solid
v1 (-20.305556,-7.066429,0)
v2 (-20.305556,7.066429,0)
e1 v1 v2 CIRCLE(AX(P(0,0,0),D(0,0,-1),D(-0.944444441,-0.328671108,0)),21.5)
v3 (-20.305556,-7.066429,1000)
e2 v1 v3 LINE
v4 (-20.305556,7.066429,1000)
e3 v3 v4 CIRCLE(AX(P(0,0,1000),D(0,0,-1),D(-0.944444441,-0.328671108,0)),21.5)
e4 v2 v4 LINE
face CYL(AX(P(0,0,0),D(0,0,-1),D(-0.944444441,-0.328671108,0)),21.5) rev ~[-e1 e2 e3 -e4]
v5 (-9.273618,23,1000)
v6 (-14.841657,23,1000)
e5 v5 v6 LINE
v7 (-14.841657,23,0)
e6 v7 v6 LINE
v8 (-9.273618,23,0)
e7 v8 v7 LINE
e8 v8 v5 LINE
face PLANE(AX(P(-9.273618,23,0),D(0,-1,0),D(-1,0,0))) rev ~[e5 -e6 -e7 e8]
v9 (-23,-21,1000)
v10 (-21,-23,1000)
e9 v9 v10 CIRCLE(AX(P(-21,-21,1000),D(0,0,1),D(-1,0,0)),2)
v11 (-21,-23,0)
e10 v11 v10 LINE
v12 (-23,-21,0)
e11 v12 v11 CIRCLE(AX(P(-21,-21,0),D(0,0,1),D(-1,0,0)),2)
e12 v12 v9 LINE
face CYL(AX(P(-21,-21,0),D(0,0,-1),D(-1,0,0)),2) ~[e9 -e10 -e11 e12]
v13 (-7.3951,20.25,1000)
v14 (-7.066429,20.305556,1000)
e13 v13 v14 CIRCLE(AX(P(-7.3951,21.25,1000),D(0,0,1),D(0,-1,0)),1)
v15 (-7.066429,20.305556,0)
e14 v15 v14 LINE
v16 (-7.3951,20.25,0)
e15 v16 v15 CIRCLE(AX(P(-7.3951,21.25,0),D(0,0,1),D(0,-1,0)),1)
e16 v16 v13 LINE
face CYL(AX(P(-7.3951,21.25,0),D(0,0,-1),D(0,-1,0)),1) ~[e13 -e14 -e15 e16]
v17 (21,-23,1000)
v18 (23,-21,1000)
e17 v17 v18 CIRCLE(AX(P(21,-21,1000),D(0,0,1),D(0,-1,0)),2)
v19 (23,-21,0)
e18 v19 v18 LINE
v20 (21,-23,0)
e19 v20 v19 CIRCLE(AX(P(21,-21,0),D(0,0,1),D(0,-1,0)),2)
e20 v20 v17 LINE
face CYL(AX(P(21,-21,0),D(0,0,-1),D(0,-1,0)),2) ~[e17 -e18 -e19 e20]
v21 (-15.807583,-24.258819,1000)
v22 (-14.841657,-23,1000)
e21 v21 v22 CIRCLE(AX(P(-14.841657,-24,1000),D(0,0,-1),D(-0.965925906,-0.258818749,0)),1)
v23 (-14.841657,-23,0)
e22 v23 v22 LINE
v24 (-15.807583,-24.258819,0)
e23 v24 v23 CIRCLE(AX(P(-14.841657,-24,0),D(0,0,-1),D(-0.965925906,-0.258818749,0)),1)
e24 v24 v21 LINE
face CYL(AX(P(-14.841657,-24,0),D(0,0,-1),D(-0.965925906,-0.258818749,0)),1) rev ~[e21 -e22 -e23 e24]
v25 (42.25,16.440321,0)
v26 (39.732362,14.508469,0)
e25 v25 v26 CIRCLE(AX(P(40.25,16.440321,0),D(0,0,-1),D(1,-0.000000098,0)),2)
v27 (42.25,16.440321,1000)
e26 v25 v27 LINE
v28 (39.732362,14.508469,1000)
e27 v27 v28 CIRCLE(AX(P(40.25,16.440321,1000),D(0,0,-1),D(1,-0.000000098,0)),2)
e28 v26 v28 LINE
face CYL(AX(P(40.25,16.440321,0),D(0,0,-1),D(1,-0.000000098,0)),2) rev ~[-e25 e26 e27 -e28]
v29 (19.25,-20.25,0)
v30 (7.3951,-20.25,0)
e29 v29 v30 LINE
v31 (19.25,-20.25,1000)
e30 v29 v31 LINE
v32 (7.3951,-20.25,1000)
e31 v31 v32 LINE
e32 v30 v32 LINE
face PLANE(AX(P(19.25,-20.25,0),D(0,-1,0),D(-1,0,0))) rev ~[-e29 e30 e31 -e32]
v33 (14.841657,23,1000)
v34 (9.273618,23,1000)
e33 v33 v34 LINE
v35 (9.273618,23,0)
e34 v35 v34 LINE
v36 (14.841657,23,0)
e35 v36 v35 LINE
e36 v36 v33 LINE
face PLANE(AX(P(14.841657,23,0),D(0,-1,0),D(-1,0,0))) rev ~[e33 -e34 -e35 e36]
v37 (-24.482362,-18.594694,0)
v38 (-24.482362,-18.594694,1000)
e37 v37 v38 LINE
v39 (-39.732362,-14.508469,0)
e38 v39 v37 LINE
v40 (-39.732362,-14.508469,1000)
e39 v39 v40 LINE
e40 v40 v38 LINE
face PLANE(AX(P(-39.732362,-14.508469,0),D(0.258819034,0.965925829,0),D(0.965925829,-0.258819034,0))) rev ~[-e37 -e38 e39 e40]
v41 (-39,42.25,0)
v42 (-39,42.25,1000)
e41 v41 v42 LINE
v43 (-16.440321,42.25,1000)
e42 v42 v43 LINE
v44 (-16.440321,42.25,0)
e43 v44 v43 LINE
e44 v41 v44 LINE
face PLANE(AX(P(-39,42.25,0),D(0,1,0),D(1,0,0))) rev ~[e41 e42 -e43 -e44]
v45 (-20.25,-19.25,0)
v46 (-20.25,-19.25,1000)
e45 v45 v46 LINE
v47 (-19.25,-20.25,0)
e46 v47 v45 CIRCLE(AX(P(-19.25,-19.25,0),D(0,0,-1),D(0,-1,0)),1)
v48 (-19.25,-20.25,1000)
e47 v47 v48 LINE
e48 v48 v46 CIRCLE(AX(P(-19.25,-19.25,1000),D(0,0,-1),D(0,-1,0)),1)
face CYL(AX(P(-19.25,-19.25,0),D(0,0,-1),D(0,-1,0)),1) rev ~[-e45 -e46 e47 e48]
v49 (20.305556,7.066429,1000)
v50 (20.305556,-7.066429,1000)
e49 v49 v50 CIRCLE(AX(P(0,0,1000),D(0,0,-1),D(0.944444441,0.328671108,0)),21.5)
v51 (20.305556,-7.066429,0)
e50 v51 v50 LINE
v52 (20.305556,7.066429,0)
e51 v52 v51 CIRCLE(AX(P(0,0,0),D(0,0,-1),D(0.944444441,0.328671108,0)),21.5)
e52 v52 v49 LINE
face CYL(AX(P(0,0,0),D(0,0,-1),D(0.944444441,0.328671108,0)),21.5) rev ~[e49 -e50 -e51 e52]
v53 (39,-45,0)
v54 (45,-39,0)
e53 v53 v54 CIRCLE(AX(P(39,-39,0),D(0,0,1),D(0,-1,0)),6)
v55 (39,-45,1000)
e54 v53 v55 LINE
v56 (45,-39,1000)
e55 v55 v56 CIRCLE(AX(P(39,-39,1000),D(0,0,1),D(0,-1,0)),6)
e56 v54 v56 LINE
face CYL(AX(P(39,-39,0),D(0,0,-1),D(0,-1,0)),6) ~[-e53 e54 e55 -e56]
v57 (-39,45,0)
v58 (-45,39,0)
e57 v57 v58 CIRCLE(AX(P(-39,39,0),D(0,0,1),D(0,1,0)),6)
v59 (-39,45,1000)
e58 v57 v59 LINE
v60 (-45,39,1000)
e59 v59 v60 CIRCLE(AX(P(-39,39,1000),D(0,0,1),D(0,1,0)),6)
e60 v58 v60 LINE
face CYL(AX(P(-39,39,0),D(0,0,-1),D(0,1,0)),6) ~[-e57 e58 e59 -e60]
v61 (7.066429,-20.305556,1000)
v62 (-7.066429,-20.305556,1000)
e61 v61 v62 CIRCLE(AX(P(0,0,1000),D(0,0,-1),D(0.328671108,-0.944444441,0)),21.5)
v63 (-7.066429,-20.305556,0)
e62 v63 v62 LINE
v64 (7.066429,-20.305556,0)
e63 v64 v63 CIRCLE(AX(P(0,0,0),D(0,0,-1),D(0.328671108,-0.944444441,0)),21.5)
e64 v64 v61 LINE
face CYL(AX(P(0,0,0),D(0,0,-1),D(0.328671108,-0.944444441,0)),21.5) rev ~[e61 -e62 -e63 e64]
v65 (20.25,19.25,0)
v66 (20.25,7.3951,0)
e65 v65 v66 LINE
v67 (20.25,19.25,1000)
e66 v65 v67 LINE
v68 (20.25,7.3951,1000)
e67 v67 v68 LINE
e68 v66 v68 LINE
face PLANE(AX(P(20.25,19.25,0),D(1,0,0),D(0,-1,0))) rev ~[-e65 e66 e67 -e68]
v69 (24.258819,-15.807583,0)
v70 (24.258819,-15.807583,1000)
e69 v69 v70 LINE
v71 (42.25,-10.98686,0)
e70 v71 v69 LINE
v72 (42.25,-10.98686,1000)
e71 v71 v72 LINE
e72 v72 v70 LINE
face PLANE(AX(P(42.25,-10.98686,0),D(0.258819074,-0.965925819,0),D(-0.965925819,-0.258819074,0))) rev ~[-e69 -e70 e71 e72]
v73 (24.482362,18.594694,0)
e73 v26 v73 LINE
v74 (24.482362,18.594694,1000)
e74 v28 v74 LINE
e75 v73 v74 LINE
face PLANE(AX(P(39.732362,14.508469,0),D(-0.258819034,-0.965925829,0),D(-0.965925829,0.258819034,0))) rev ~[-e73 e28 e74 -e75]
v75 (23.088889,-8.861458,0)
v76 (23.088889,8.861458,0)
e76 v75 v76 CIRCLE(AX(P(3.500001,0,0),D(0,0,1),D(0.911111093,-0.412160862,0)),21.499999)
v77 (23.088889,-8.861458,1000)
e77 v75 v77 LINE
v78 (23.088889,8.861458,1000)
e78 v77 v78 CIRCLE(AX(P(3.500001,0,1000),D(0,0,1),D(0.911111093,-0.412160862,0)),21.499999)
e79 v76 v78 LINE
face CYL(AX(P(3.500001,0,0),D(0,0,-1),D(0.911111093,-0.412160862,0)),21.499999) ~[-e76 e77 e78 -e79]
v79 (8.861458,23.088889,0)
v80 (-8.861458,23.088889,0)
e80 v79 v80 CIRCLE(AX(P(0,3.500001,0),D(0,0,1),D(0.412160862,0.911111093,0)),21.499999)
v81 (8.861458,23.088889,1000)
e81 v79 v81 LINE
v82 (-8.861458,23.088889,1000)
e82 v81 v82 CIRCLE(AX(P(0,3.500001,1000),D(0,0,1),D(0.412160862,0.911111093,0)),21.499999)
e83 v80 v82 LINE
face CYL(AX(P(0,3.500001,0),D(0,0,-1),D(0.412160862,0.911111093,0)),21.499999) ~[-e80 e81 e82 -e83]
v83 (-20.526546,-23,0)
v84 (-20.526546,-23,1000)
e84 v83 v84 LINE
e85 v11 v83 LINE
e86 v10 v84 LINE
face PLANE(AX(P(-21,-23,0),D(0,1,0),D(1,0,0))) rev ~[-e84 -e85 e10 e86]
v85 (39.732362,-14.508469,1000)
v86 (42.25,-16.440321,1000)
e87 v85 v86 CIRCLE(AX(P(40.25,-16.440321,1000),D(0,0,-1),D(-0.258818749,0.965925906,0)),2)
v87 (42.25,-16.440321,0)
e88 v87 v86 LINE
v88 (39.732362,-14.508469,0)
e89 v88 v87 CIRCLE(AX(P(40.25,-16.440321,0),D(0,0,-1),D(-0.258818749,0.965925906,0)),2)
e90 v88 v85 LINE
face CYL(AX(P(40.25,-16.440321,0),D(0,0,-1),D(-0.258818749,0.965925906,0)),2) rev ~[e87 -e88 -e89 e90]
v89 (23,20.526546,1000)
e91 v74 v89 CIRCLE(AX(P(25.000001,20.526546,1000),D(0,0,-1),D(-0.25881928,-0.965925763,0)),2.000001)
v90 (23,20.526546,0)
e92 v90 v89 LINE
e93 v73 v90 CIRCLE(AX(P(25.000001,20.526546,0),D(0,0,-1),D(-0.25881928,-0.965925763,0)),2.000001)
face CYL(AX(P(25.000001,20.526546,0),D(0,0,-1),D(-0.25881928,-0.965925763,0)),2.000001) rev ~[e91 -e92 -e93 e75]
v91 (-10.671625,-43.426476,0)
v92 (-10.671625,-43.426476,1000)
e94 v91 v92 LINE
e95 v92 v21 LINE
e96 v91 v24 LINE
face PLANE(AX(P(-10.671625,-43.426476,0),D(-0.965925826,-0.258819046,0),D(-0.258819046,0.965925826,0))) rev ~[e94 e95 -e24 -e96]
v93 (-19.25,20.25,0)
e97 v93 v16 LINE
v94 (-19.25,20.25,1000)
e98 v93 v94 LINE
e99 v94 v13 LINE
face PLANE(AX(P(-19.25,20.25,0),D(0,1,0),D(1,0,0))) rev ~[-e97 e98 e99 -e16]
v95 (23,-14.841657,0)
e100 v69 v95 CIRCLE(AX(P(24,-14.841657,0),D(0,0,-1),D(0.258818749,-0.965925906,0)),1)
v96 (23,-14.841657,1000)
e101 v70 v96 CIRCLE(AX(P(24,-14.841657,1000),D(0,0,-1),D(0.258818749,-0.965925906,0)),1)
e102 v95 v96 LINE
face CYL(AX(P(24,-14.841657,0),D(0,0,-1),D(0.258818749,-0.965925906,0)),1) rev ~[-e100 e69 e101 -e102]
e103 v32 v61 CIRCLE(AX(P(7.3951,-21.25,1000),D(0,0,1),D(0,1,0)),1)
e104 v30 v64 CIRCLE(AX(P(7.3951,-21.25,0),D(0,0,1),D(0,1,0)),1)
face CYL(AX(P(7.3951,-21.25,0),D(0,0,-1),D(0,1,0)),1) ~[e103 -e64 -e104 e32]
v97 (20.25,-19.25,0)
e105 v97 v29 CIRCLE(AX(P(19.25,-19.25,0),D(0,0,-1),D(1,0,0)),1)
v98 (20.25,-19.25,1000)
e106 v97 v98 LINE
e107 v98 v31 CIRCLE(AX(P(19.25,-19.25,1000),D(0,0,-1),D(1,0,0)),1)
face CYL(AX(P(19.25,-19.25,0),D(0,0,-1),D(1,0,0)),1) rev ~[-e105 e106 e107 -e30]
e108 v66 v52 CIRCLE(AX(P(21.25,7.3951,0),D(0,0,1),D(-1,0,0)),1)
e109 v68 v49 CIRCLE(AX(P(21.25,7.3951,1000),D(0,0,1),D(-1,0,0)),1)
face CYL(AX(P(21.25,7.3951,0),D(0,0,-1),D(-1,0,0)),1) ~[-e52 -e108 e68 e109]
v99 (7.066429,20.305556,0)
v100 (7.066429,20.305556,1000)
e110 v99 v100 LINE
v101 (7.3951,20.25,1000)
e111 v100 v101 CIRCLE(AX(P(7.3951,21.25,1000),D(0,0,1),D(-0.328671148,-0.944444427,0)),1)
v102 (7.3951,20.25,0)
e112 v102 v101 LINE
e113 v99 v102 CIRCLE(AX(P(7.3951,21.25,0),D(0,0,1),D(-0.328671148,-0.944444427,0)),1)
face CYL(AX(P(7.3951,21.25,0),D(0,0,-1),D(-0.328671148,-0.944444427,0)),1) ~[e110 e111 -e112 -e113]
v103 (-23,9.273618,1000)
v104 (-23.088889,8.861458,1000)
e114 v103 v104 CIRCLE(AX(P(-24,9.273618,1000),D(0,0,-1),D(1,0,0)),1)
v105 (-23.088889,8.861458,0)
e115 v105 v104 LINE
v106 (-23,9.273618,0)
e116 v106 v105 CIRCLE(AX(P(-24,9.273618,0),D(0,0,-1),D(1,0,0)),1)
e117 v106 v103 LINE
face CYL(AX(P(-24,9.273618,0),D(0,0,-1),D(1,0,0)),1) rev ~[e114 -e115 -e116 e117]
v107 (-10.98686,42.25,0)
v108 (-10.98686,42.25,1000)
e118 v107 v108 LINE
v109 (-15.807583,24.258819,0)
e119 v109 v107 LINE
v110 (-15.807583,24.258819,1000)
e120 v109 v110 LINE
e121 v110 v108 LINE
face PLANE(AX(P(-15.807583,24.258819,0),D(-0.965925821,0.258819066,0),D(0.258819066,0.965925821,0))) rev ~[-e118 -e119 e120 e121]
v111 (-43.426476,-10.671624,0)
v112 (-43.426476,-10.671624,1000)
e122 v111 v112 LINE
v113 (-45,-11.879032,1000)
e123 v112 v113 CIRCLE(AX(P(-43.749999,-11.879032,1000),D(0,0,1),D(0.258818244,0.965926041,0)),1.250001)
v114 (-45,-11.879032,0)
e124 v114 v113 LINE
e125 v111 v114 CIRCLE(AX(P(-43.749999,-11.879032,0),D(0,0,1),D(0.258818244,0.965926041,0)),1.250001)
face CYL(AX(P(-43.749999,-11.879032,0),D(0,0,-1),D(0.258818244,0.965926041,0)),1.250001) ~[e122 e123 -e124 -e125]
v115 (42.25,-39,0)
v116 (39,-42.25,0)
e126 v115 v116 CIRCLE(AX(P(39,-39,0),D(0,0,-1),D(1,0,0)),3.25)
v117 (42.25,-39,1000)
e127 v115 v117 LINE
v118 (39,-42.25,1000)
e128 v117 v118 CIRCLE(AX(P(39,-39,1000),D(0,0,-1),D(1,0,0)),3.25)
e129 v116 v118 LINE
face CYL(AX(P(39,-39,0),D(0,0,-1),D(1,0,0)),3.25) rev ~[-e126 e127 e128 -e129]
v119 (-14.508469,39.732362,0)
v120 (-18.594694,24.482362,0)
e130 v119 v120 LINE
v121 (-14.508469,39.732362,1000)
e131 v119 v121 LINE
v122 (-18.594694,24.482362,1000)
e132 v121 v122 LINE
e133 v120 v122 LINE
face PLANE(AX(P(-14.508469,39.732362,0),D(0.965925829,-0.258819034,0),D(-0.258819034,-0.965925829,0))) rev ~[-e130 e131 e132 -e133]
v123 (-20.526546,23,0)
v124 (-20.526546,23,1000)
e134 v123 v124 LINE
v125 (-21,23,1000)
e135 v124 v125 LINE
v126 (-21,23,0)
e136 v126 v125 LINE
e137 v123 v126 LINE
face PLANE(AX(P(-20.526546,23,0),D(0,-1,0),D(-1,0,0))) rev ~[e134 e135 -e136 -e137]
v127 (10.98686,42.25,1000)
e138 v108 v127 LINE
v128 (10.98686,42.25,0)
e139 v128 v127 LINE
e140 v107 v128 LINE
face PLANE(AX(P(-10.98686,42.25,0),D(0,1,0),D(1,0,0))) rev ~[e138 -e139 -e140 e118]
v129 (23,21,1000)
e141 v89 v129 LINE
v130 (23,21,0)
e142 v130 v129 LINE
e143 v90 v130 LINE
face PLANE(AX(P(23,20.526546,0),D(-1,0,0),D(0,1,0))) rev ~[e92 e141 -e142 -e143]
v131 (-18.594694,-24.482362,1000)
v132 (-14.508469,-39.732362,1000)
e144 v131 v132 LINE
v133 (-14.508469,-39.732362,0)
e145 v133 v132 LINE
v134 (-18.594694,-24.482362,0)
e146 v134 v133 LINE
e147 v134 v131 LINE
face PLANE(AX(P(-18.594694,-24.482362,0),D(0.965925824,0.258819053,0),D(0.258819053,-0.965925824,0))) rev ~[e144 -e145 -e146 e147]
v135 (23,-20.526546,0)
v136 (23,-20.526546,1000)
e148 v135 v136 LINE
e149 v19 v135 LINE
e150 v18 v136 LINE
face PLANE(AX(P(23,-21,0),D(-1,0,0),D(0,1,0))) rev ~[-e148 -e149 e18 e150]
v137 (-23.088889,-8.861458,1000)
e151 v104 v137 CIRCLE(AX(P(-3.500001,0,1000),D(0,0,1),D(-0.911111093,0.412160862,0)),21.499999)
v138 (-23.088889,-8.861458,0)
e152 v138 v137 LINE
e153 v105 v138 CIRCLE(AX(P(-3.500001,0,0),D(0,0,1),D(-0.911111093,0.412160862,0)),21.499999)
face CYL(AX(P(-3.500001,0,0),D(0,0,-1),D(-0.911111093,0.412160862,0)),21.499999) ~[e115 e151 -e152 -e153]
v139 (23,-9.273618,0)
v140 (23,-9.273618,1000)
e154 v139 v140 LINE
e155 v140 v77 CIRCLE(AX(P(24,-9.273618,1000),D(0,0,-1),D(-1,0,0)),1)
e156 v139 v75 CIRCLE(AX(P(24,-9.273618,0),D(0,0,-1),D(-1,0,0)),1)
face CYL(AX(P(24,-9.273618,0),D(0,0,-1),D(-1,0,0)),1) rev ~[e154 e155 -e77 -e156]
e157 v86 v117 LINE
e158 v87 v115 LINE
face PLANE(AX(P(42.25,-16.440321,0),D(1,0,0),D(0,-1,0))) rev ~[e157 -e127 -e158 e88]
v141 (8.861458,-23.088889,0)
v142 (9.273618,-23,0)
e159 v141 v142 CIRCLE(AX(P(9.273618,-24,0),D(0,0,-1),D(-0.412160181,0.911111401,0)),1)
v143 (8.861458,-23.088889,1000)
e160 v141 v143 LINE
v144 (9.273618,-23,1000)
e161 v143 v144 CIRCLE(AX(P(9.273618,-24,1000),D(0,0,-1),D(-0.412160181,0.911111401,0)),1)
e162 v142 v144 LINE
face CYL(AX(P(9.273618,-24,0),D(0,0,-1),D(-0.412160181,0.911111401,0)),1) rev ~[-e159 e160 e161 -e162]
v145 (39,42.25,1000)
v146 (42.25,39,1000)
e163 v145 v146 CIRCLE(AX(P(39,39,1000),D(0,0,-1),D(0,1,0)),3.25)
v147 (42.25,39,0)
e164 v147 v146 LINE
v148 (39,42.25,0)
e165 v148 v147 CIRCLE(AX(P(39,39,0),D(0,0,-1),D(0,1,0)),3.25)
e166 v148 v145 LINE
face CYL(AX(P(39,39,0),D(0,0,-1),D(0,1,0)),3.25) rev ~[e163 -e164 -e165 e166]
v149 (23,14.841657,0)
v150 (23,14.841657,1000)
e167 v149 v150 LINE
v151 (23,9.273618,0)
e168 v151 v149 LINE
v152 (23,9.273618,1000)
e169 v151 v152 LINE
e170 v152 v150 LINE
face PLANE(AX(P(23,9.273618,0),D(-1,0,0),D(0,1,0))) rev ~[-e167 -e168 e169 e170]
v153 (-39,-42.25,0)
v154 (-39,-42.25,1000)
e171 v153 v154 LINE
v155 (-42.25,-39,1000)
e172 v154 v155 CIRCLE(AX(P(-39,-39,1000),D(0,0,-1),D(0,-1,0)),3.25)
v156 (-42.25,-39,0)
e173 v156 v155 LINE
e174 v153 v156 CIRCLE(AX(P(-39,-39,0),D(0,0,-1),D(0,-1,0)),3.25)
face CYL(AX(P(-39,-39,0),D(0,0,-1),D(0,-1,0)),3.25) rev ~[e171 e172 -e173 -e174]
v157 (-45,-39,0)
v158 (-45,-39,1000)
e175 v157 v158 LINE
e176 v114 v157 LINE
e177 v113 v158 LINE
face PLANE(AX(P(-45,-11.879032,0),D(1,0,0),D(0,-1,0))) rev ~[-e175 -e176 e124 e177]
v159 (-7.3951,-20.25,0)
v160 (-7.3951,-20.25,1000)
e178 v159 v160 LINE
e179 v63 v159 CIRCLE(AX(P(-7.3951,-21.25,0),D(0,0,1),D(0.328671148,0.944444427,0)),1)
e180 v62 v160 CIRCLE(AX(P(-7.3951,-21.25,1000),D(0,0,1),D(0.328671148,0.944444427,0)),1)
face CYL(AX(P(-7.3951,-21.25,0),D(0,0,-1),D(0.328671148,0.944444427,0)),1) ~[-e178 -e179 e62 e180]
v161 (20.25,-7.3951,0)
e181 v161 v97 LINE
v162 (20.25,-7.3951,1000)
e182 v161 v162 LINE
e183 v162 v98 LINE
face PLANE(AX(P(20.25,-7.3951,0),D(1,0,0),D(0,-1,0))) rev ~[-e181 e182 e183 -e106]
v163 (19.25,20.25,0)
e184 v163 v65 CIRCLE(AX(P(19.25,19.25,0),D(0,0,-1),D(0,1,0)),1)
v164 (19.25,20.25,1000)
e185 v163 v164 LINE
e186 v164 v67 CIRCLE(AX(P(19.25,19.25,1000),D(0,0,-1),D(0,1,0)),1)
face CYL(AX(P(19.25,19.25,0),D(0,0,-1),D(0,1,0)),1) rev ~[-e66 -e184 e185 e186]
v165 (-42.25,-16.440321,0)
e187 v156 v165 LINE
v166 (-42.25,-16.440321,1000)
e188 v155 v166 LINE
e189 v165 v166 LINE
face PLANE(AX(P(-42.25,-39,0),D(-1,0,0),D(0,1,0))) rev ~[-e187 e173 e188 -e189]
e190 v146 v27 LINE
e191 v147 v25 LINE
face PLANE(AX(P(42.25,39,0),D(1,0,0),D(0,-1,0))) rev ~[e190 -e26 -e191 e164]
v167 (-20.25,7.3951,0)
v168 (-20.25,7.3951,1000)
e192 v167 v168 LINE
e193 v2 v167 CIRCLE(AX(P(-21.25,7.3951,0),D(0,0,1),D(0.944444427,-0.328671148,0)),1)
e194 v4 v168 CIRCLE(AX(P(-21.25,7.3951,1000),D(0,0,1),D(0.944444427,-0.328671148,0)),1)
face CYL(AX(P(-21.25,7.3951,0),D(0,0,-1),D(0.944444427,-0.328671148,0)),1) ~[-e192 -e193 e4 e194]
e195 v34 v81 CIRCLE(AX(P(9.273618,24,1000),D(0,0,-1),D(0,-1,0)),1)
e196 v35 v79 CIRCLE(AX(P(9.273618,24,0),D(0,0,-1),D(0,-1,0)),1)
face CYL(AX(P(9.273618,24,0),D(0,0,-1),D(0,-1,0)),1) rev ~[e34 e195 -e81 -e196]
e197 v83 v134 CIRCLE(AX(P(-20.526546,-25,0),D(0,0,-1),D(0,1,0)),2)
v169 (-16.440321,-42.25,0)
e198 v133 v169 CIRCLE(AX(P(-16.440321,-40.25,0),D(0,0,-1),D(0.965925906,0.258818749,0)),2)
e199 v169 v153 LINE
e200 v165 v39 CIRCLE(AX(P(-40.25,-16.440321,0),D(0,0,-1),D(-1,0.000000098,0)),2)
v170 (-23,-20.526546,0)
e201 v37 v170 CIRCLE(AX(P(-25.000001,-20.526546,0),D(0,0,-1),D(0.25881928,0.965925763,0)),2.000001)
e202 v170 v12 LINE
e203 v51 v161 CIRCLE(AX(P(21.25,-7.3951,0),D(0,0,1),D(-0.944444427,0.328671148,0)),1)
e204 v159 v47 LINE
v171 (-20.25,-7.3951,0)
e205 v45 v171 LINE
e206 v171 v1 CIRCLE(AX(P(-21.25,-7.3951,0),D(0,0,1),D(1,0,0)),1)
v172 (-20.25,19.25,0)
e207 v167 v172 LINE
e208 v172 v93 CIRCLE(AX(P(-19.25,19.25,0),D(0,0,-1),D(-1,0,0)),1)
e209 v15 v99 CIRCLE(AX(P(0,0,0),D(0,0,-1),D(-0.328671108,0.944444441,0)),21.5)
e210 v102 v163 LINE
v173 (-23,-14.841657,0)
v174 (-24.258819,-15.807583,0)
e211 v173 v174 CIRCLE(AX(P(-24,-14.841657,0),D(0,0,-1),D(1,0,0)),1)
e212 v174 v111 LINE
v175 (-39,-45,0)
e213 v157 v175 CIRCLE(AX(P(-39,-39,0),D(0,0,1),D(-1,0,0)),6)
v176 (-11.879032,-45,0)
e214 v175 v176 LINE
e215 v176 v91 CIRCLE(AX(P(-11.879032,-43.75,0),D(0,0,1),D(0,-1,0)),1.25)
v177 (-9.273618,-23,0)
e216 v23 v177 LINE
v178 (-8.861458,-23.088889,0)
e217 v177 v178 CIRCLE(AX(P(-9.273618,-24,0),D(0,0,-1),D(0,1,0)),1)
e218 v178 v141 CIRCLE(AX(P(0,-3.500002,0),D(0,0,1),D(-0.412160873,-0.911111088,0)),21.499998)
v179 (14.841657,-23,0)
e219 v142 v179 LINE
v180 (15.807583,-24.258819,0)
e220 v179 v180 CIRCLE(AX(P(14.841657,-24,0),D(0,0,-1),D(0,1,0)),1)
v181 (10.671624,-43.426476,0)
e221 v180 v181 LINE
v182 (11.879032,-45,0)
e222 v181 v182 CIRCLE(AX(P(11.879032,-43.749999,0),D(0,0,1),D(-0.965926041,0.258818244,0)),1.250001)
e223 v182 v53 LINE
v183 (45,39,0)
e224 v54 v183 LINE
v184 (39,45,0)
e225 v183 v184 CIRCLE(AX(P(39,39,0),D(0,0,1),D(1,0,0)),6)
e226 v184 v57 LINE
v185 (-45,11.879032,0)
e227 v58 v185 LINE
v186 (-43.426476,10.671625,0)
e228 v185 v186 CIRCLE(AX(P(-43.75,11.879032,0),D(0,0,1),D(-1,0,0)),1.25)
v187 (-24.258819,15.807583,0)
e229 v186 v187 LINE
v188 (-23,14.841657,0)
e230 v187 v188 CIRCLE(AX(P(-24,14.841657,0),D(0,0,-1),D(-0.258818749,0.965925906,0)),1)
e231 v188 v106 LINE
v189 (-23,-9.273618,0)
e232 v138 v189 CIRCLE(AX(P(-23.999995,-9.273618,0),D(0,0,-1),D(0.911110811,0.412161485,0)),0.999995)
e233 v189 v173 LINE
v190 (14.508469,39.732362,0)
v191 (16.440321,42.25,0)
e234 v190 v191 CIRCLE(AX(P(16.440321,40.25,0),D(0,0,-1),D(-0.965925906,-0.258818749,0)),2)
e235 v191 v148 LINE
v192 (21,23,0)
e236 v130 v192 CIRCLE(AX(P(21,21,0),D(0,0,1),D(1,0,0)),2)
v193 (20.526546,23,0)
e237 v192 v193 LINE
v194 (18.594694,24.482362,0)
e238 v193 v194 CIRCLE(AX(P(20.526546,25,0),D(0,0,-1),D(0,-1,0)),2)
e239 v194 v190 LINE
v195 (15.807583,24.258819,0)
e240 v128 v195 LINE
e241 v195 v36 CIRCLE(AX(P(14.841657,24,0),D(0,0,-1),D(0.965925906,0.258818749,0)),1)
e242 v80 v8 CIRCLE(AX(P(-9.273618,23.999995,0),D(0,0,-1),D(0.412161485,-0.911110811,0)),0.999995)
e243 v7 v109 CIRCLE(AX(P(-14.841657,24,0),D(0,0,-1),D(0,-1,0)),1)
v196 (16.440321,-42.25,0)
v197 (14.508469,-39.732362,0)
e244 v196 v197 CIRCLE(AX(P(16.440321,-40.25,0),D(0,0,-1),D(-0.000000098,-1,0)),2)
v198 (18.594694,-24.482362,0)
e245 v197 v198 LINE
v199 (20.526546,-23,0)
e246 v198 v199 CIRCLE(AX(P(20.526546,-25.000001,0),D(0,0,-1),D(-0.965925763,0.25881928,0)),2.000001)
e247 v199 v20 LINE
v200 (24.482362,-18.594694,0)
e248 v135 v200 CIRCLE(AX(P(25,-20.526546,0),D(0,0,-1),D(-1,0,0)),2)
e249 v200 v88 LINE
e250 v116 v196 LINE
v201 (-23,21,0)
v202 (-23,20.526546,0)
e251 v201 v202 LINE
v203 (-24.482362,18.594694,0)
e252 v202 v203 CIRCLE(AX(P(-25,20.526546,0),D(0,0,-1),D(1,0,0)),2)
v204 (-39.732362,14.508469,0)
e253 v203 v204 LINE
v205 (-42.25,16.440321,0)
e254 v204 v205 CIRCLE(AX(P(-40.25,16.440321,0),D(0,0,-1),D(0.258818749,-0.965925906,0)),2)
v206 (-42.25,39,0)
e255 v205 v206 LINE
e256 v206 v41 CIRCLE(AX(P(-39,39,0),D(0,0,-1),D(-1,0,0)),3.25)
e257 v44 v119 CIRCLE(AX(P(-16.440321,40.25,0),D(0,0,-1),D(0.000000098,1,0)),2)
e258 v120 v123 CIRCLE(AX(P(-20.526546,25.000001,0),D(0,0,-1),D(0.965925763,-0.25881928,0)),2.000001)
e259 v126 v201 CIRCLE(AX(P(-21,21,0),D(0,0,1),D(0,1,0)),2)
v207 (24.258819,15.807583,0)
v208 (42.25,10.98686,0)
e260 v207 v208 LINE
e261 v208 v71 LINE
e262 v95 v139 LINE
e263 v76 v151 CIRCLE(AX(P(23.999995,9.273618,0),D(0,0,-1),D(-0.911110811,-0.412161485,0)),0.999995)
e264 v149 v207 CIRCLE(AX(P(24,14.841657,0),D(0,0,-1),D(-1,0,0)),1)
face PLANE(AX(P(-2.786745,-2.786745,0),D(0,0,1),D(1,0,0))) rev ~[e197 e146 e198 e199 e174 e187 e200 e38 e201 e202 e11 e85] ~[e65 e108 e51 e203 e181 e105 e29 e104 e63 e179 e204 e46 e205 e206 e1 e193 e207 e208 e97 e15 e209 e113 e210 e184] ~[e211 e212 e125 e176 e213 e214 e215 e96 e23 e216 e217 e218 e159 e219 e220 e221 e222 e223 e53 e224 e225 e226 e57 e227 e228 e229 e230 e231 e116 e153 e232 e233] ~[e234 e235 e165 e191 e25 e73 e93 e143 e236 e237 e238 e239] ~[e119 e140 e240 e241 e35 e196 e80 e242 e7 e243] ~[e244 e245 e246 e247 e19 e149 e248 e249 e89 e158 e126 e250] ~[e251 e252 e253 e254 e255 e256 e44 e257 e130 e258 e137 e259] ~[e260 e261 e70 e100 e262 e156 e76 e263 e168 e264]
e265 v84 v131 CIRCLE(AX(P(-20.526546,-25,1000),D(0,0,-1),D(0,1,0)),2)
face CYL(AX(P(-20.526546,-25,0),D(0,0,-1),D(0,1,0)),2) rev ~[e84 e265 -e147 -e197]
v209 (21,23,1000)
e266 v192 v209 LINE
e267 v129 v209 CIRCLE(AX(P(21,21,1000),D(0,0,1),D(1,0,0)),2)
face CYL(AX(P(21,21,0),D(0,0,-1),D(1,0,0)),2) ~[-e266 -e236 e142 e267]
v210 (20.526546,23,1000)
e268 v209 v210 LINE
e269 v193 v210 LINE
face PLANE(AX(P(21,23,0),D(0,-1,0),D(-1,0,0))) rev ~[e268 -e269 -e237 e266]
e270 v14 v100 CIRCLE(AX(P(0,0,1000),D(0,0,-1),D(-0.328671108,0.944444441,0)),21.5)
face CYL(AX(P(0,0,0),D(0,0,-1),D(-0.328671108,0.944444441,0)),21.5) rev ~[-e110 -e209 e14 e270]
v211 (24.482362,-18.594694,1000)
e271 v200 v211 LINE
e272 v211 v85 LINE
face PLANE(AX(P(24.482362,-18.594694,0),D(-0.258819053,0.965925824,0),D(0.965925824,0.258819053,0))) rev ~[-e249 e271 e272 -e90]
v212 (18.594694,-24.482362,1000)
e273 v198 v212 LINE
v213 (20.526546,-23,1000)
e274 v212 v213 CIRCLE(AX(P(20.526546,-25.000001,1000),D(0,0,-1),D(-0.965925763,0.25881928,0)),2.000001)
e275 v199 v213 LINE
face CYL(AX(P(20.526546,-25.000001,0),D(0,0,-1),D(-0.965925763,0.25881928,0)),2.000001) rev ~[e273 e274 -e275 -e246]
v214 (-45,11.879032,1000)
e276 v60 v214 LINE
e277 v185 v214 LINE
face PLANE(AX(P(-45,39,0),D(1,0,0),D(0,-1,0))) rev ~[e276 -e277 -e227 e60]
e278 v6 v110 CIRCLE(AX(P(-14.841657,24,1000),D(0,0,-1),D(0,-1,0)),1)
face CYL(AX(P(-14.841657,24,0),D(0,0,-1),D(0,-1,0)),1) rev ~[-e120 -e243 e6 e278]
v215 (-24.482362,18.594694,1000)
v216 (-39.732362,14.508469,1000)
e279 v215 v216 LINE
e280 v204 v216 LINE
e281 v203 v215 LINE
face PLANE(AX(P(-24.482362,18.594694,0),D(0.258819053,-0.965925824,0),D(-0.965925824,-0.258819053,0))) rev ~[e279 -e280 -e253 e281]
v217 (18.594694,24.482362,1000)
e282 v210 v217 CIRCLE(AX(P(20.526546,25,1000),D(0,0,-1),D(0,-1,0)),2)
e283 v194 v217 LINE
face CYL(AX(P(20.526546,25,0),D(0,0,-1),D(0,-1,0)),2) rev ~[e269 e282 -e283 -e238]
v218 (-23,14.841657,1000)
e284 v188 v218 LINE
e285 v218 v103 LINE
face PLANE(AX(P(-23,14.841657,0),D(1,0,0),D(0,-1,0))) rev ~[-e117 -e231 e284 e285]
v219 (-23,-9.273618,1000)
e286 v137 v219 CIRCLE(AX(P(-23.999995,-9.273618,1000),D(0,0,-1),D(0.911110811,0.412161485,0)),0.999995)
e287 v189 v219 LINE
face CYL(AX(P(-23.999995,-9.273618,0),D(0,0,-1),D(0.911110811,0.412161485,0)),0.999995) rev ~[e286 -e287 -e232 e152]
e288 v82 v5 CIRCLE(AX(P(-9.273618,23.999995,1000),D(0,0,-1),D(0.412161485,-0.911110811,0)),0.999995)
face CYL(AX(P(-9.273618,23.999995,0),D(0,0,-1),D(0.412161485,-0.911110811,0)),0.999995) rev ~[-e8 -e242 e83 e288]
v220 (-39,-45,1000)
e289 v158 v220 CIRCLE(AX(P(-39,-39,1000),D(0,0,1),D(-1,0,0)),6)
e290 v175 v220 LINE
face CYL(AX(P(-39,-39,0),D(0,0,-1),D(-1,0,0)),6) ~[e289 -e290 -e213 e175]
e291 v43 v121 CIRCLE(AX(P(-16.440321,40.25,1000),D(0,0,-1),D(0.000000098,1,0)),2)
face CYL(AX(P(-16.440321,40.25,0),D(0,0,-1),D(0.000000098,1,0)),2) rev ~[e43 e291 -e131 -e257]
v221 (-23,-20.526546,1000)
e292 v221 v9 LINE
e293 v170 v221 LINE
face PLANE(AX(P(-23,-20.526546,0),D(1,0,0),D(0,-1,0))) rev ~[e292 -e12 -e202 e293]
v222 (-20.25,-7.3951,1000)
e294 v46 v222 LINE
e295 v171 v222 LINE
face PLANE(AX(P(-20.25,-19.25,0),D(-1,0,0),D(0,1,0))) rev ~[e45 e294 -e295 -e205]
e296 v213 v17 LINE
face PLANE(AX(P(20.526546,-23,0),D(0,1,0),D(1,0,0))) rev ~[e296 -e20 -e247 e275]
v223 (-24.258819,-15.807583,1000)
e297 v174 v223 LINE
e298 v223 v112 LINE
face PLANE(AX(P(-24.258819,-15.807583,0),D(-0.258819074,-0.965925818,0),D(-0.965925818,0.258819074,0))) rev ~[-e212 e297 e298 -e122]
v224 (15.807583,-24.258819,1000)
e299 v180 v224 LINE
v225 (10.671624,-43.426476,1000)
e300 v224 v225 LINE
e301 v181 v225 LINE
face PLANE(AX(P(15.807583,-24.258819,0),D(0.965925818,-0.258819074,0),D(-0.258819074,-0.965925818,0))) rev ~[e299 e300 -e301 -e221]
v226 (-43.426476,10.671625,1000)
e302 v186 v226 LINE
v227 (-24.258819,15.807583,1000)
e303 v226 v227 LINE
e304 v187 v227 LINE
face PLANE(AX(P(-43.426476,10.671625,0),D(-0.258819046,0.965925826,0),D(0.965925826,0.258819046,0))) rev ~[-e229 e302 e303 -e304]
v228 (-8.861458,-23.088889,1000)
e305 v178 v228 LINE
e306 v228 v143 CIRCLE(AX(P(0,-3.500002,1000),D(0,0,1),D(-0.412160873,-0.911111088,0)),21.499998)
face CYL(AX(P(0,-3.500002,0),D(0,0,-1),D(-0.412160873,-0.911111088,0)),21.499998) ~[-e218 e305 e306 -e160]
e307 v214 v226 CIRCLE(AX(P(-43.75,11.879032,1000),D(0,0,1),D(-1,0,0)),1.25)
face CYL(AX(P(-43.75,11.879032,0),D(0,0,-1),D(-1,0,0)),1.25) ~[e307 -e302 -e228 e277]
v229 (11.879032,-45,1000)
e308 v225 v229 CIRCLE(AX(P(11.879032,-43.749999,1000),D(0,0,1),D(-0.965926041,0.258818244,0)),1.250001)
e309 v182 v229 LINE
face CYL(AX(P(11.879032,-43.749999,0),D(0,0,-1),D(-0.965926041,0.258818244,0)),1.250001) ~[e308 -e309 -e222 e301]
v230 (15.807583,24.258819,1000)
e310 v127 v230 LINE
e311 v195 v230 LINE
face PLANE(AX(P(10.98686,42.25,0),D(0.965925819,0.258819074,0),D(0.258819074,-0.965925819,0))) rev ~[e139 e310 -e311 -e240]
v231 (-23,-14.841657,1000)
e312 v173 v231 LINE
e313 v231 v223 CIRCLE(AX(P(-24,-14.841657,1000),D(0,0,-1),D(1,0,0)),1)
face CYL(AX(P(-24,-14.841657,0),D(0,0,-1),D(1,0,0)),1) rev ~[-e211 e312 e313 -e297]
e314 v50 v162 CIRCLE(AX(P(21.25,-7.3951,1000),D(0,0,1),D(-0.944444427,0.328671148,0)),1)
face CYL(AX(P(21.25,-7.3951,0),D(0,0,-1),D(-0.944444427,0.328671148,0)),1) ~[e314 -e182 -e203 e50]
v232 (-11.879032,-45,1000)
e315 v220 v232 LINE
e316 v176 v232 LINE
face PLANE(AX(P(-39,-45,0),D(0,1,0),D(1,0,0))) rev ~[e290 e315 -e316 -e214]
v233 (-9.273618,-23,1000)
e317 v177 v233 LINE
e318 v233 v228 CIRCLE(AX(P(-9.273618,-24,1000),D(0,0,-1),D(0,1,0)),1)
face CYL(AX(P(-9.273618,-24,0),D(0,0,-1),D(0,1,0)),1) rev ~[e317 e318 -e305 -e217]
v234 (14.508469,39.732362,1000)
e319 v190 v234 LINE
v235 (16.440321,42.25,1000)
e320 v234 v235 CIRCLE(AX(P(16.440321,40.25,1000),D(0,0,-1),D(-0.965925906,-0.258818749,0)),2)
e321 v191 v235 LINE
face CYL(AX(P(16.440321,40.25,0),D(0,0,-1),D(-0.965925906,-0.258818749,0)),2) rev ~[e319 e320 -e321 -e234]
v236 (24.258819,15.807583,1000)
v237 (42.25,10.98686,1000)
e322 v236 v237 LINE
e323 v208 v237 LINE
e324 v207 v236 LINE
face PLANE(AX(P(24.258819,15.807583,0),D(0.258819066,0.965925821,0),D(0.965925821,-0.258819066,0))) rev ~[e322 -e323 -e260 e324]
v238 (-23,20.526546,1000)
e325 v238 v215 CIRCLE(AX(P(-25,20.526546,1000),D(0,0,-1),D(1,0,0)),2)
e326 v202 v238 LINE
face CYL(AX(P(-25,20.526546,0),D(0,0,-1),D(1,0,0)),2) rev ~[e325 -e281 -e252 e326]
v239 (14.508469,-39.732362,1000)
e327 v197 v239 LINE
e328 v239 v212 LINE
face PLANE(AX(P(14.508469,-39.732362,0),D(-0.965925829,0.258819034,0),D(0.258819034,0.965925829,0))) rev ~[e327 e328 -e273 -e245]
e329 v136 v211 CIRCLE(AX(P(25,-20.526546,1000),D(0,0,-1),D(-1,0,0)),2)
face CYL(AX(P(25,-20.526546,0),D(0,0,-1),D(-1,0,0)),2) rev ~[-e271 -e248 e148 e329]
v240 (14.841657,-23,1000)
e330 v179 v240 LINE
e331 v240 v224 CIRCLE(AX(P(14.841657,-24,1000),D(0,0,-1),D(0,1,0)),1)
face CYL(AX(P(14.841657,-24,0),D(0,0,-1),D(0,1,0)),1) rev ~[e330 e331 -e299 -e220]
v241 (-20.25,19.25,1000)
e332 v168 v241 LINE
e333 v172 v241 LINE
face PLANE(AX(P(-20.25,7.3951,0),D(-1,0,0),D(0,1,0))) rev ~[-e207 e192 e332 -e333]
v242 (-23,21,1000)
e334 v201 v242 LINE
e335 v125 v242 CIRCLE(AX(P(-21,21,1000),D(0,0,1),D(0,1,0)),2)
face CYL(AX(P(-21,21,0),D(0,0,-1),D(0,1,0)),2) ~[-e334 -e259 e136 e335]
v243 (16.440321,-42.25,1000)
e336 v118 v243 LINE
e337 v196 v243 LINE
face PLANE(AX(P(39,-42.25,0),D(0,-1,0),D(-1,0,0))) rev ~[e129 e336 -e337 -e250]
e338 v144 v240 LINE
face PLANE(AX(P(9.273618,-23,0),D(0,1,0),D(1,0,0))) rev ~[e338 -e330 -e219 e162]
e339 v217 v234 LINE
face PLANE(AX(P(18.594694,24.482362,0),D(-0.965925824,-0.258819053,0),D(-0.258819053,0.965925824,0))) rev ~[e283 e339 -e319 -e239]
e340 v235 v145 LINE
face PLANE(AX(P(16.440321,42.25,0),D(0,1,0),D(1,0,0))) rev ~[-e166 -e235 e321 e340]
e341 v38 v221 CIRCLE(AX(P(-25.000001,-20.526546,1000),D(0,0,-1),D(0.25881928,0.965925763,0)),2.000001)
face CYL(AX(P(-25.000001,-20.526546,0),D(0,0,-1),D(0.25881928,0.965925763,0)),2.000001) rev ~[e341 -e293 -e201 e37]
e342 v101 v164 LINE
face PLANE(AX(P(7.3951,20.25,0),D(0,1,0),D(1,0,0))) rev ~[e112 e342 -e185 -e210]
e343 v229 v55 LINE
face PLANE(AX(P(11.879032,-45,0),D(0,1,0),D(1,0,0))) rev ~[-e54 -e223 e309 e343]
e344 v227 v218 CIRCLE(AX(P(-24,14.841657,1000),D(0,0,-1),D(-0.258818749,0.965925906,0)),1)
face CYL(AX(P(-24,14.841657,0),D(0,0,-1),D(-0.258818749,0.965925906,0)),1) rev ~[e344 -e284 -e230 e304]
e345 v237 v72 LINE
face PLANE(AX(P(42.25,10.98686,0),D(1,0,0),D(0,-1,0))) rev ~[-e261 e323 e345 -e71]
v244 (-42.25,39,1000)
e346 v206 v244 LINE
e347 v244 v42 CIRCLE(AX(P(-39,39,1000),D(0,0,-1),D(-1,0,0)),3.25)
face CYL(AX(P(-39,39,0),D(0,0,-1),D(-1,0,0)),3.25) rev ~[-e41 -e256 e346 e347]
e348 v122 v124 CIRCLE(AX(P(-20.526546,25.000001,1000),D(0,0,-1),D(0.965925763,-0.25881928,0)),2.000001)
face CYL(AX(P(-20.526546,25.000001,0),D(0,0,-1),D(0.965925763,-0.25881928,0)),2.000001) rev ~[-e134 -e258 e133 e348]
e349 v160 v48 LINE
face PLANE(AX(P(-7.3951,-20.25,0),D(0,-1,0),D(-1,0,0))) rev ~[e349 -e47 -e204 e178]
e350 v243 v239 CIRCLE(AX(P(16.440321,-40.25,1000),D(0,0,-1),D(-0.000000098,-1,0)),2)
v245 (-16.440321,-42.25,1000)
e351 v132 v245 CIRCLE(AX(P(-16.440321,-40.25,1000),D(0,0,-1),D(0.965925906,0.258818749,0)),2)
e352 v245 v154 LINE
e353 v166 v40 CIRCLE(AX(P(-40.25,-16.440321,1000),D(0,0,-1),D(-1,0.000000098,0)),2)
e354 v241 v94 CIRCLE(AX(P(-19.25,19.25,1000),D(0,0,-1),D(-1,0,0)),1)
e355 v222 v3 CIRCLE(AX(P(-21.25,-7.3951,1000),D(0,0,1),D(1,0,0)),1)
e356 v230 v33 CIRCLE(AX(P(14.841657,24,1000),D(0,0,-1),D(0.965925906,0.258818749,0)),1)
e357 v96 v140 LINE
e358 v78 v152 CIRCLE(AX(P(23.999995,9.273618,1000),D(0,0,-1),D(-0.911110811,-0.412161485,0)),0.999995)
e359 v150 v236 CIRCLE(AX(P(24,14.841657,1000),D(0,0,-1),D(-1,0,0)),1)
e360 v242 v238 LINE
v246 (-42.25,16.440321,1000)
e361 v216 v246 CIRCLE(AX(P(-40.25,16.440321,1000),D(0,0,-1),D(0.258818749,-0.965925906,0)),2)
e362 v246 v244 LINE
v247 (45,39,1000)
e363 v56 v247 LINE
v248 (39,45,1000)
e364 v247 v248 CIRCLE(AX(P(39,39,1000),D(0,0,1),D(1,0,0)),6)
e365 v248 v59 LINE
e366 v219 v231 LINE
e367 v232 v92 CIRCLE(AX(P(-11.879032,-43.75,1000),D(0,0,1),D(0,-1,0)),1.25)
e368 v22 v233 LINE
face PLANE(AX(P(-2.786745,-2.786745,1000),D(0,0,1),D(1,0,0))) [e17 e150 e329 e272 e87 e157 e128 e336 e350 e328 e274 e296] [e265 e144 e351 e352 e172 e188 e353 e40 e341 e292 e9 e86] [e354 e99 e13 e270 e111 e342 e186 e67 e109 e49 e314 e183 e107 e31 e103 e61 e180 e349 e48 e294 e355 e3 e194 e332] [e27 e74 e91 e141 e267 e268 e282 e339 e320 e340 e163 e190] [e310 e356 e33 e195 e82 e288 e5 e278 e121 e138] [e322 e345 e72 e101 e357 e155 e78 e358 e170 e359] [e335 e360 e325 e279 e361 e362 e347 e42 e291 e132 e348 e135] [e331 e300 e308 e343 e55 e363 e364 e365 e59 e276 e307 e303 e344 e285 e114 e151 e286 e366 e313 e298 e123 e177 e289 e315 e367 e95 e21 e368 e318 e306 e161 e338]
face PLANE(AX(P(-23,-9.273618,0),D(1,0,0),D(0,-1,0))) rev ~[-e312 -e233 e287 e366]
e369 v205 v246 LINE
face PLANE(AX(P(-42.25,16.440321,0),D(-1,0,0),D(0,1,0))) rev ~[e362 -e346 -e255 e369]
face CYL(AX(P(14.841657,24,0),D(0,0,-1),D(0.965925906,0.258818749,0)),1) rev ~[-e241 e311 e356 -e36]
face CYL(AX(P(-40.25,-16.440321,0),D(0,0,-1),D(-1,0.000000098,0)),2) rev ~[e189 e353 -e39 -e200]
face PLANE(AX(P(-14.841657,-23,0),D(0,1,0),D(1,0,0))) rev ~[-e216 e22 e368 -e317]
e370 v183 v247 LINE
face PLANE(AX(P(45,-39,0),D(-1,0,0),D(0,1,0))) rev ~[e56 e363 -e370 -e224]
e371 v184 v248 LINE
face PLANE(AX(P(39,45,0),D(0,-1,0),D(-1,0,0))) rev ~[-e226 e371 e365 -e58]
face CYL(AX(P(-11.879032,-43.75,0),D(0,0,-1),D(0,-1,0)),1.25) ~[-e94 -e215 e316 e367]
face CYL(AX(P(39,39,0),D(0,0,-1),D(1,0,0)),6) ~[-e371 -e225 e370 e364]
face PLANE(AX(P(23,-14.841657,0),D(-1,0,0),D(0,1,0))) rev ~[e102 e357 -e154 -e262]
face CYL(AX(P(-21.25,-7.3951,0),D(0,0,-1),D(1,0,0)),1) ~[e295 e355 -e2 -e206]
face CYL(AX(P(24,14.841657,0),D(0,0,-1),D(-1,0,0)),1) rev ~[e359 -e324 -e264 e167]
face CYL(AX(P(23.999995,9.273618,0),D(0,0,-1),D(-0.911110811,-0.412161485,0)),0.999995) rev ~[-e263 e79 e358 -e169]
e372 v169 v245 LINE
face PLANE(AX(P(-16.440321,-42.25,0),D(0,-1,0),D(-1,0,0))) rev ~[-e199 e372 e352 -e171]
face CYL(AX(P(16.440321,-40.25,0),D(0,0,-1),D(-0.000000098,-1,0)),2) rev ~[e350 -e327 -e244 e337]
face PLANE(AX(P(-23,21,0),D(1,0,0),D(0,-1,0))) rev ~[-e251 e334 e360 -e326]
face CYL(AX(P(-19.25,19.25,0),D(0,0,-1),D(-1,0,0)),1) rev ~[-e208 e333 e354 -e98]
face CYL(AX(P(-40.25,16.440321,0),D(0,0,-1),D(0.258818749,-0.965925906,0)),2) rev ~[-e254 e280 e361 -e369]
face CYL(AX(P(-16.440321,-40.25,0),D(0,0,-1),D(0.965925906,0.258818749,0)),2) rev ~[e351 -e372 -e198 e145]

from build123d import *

# Parameters (mm, degrees)
F1_DEPTH = 1000


# Not quite as in the source:
# - ends of sketch curves that miss each other by under 0.0002 mm in the source are joined


with BuildPart() as f1:
    # F0 (on Top) → F1 (new body)
    with BuildSketch(Plane.XY):
        with BuildLine():
            ThreePointArc((8.8614578186, -23.0888885991), (9.062799833, -23.022474706), (9.273618, -23))
            Line((9.273618, -23), (14.841657, -23))
            ThreePointArc((14.841657, -23), (15.6350103133, -23.3912385359), (15.8075828492, -24.2588189596))
            Line((15.8075828492, -24.2588189596), (10.671624, -43.426476))
            ThreePointArc((10.671624, -43.426476), (10.8873403242, -44.5109517857), (11.879032, -45))
            Line((11.879032, -45), (39, -45))
            ThreePointArc((39, -45), (43.2426406871, -43.2426406871), (45, -39))
            Line((45, -39), (45, 39))
            ThreePointArc((45, 39), (43.2426406871, 43.2426406871), (39, 45))
            Line((39, 45), (-39, 45))
            ThreePointArc((-39, 45), (-43.2426406871, 43.2426406871), (-45, 39))
            Line((-45, 39), (-45, 11.879032))
            ThreePointArc((-45, 11.879032), (-44.5109517857, 10.8873403242), (-43.4264761923, 10.6716247175))
            Line((-43.4264761923, 10.6716247175), (-24.258819, 15.807583))
            ThreePointArc((-24.258819, 15.807583), (-23.3912385359, 15.6350103133), (-23, 14.841657))
            Line((-23, 14.841657), (-23, 9.273618))
            ThreePointArc((-23, 9.273618), (-23.022474706, 9.062799833), (-23.0888885991, 8.8614578186))
            ThreePointArc((-23.0888885991, 8.8614578186), (-25, 0), (-23.0888887851, -8.8614579028))
            ThreePointArc((-23.0888887851, -8.8614579028), (-23.022474706, -9.062799833), (-23, -9.273618))
            Line((-23, -9.273618), (-23, -14.841657))
            ThreePointArc((-23, -14.841657), (-23.3912385359, -15.6350103133), (-24.2588189596, -15.8075828492))
            Line((-24.2588189596, -15.8075828492), (-43.426476, -10.671624))
            ThreePointArc((-43.426476, -10.671624), (-44.5109517857, -10.8873403242), (-45, -11.879032))
            Line((-45, -11.879032), (-45, -39))
            ThreePointArc((-45, -39), (-43.2426406871, -43.2426406871), (-39, -45))
            Line((-39, -45), (-11.879032, -45))
            ThreePointArc((-11.879032, -45), (-10.8873403242, -44.5109517857), (-10.6716247175, -43.4264761923))
            Line((-10.6716247175, -43.4264761923), (-15.807583, -24.258819))
            ThreePointArc((-15.807583, -24.258819), (-15.6350103133, -23.3912385359), (-14.841657, -23))
            Line((-14.841657, -23), (-9.273618, -23))
            ThreePointArc((-9.273618, -23), (-9.062799833, -23.022474706), (-8.8614578186, -23.0888885991))
            ThreePointArc((-8.8614578186, -23.0888885991), (0, -25), (8.8614578186, -23.0888885991))
        make_face()
        with BuildLine():
            Line((-39.732362, -14.508469), (-24.482362, -18.594694))
            ThreePointArc((-24.482362, -18.594694), (-23.4132933733, -19.3090230718), (-23, -20.526546))
            Line((-23, -20.526546), (-23, -21))
            ThreePointArc((-23, -21), (-22.4142135624, -22.4142135624), (-21, -23))
            Line((-21, -23), (-20.526546, -23))
            ThreePointArc((-20.526546, -23), (-19.3090230718, -23.4132933733), (-18.5946943016, -24.4823620808))
            Line((-18.5946943016, -24.4823620808), (-14.508469, -39.732362))
            ThreePointArc((-14.508469, -39.732362), (-14.8536143733, -41.4675229282), (-16.440321, -42.25))
            Line((-16.440321, -42.25), (-39, -42.25))
            ThreePointArc((-39, -42.25), (-41.2980970389, -41.2980970389), (-42.25, -39))
            Line((-42.25, -39), (-42.25, -16.440321))
            ThreePointArc((-42.25, -16.440321), (-41.4675229282, -14.8536143733), (-39.732362, -14.508469))
        make_face(mode=Mode.SUBTRACT)
        with BuildLine():
            Line((14.508469, -39.732362), (18.594694, -24.482362))
            ThreePointArc((18.594694, -24.482362), (19.3090230718, -23.4132933733), (20.526546, -23))
            Line((20.526546, -23), (21, -23))
            ThreePointArc((21, -23), (22.4142135624, -22.4142135624), (23, -21))
            Line((23, -21), (23, -20.526546))
            ThreePointArc((23, -20.526546), (23.4132933733, -19.3090230718), (24.4823620808, -18.5946943016))
            Line((24.4823620808, -18.5946943016), (39.732362, -14.508469))
            ThreePointArc((39.732362, -14.508469), (41.4675229282, -14.8536143733), (42.25, -16.440321))
            Line((42.25, -16.440321), (42.25, -39))
            ThreePointArc((42.25, -39), (41.2980970389, -41.2980970389), (39, -42.25))
            Line((39, -42.25), (16.440321, -42.25))
            ThreePointArc((16.440321, -42.25), (14.8536143733, -41.4675229282), (14.508469, -39.732362))
        make_face(mode=Mode.SUBTRACT)
        with BuildLine():
            Line((-7.3951, -20.25), (-19.25, -20.25))
            ThreePointArc((-19.25, -20.25), (-19.9571067812, -19.9571067812), (-20.25, -19.25))
            Line((-20.25, -19.25), (-20.25, -7.3951))
            ThreePointArc((-20.25, -7.3951), (-20.2639867072, -7.2284333074), (-20.3055555728, -7.0664288513))
            ThreePointArc((-20.3055554887, -7.066428822), (-21.5, 0), (-20.3055554887, 7.066428822))
            ThreePointArc((-20.3055555728, 7.0664288513), (-20.2639867072, 7.2284333074), (-20.25, 7.3951))
            Line((-20.25, 7.3951), (-20.25, 19.25))
            ThreePointArc((-20.25, 19.25), (-19.9571067812, 19.9571067812), (-19.25, 20.25))
            Line((-19.25, 20.25), (-7.3951, 20.25))
            ThreePointArc((-7.3951, 20.25), (-7.2284333074, 20.2639867072), (-7.0664288513, 20.3055555728))
            ThreePointArc((-7.066428822, 20.3055554887), (0, 21.5), (7.066428822, 20.3055554887))
            ThreePointArc((7.0664288513, 20.3055555728), (7.2284333074, 20.2639867072), (7.3951, 20.25))
            Line((7.3951, 20.25), (19.25, 20.25))
            ThreePointArc((19.25, 20.25), (19.9571067812, 19.9571067812), (20.25, 19.25))
            Line((20.25, 19.25), (20.25, 7.3951))
            ThreePointArc((20.25, 7.3951), (20.2639867072, 7.2284333074), (20.3055555728, 7.0664288513))
            ThreePointArc((20.3055554887, 7.066428822), (21.5, 0), (20.3055554887, -7.066428822))
            ThreePointArc((20.3055555728, -7.0664288513), (20.2639867072, -7.2284333074), (20.25, -7.3951))
            Line((20.25, -7.3951), (20.25, -19.25))
            ThreePointArc((20.25, -19.25), (19.9571067812, -19.9571067812), (19.25, -20.25))
            Line((19.25, -20.25), (7.3951, -20.25))
            ThreePointArc((7.3951, -20.25), (7.2284333074, -20.2639867072), (7.0664288513, -20.3055555728))
            ThreePointArc((7.066428822, -20.3055554887), (0, -21.5), (-7.066428822, -20.3055554887))
            ThreePointArc((-7.0664288513, -20.3055555728), (-7.2284333074, -20.2639867072), (-7.3951, -20.25))
        make_face(mode=Mode.SUBTRACT)
        with BuildLine():
            Line((42.25, -10.98686), (24.258819, -15.807583))
            ThreePointArc((24.258819, -15.807583), (23.3912385359, -15.6350103133), (23, -14.841657))
            Line((23, -14.841657), (23, -9.273618))
            ThreePointArc((23, -9.273618), (23.022474706, -9.062799833), (23.0888885991, -8.8614578186))
            ThreePointArc((23.0888885991, -8.8614578186), (25, 0), (23.0888887851, 8.8614579028))
            ThreePointArc((23.0888887851, 8.8614579028), (23.022474706, 9.062799833), (23, 9.273618))
            Line((23, 9.273618), (23, 14.841657))
            ThreePointArc((23, 14.841657), (23.3912385359, 15.6350103133), (24.2588189596, 15.8075828492))
            Line((24.2588189596, 15.8075828492), (42.25, 10.98686))
            Line((42.25, 10.98686), (42.25, -10.98686))
        make_face(mode=Mode.SUBTRACT)
        with BuildLine():
            Line((-14.508469, 39.732362), (-18.594694, 24.482362))
            ThreePointArc((-18.594694, 24.482362), (-19.3090230718, 23.4132933733), (-20.526546, 23))
            Line((-20.526546, 23), (-21, 23))
            ThreePointArc((-21, 23), (-22.4142135624, 22.4142135624), (-23, 21))
            Line((-23, 21), (-23, 20.526546))
            ThreePointArc((-23, 20.526546), (-23.4132933733, 19.3090230718), (-24.4823620808, 18.5946943016))
            Line((-24.4823620808, 18.5946943016), (-39.732362, 14.508469))
            ThreePointArc((-39.732362, 14.508469), (-41.4675229282, 14.8536143733), (-42.25, 16.440321))
            Line((-42.25, 16.440321), (-42.25, 39))
            ThreePointArc((-42.25, 39), (-41.2980970389, 41.2980970389), (-39, 42.25))
            Line((-39, 42.25), (-16.440321, 42.25))
            ThreePointArc((-16.440321, 42.25), (-14.8536143733, 41.4675229282), (-14.508469, 39.732362))
        make_face(mode=Mode.SUBTRACT)
        with BuildLine():
            Line((-9.273618, 23), (-14.841657, 23))
            ThreePointArc((-14.841657, 23), (-15.6350103133, 23.3912385359), (-15.8075828492, 24.2588189596))
            Line((-15.8075828492, 24.2588189596), (-10.98686, 42.25))
            Line((-10.98686, 42.25), (10.98686, 42.25))
            Line((10.98686, 42.25), (15.807583, 24.258819))
            ThreePointArc((15.807583, 24.258819), (15.6350103133, 23.3912385359), (14.841657, 23))
            Line((14.841657, 23), (9.273618, 23))
            ThreePointArc((9.273618, 23), (9.062799833, 23.022474706), (8.8614578186, 23.0888885991))
            ThreePointArc((8.8614578186, 23.0888885991), (0, 25), (-8.8614579028, 23.0888887851))
            ThreePointArc((-8.8614579028, 23.0888887851), (-9.062799833, 23.022474706), (-9.273618, 23))
        make_face(mode=Mode.SUBTRACT)
        with BuildLine():
            Line((39.732362, 14.508469), (24.482362, 18.594694))
            ThreePointArc((24.482362, 18.594694), (23.4132933733, 19.3090230718), (23, 20.526546))
            Line((23, 20.526546), (23, 21))
            ThreePointArc((23, 21), (22.4142135624, 22.4142135624), (21, 23))
            Line((21, 23), (20.526546, 23))
            ThreePointArc((20.526546, 23), (19.3090230718, 23.4132933733), (18.5946943016, 24.4823620808))
            Line((18.5946943016, 24.4823620808), (14.508469, 39.732362))
            ThreePointArc((14.508469, 39.732362), (14.8536143733, 41.4675229282), (16.440321, 42.25))
            Line((16.440321, 42.25), (39, 42.25))
            ThreePointArc((39, 42.25), (41.2980970389, 41.2980970389), (42.25, 39))
            Line((42.25, 39), (42.25, 16.440321))
            ThreePointArc((42.25, 16.440321), (41.4675229282, 14.8536143733), (39.732362, 14.508469))
        make_face(mode=Mode.SUBTRACT)
    extrude(amount=F1_DEPTH)


solid = f1.part
